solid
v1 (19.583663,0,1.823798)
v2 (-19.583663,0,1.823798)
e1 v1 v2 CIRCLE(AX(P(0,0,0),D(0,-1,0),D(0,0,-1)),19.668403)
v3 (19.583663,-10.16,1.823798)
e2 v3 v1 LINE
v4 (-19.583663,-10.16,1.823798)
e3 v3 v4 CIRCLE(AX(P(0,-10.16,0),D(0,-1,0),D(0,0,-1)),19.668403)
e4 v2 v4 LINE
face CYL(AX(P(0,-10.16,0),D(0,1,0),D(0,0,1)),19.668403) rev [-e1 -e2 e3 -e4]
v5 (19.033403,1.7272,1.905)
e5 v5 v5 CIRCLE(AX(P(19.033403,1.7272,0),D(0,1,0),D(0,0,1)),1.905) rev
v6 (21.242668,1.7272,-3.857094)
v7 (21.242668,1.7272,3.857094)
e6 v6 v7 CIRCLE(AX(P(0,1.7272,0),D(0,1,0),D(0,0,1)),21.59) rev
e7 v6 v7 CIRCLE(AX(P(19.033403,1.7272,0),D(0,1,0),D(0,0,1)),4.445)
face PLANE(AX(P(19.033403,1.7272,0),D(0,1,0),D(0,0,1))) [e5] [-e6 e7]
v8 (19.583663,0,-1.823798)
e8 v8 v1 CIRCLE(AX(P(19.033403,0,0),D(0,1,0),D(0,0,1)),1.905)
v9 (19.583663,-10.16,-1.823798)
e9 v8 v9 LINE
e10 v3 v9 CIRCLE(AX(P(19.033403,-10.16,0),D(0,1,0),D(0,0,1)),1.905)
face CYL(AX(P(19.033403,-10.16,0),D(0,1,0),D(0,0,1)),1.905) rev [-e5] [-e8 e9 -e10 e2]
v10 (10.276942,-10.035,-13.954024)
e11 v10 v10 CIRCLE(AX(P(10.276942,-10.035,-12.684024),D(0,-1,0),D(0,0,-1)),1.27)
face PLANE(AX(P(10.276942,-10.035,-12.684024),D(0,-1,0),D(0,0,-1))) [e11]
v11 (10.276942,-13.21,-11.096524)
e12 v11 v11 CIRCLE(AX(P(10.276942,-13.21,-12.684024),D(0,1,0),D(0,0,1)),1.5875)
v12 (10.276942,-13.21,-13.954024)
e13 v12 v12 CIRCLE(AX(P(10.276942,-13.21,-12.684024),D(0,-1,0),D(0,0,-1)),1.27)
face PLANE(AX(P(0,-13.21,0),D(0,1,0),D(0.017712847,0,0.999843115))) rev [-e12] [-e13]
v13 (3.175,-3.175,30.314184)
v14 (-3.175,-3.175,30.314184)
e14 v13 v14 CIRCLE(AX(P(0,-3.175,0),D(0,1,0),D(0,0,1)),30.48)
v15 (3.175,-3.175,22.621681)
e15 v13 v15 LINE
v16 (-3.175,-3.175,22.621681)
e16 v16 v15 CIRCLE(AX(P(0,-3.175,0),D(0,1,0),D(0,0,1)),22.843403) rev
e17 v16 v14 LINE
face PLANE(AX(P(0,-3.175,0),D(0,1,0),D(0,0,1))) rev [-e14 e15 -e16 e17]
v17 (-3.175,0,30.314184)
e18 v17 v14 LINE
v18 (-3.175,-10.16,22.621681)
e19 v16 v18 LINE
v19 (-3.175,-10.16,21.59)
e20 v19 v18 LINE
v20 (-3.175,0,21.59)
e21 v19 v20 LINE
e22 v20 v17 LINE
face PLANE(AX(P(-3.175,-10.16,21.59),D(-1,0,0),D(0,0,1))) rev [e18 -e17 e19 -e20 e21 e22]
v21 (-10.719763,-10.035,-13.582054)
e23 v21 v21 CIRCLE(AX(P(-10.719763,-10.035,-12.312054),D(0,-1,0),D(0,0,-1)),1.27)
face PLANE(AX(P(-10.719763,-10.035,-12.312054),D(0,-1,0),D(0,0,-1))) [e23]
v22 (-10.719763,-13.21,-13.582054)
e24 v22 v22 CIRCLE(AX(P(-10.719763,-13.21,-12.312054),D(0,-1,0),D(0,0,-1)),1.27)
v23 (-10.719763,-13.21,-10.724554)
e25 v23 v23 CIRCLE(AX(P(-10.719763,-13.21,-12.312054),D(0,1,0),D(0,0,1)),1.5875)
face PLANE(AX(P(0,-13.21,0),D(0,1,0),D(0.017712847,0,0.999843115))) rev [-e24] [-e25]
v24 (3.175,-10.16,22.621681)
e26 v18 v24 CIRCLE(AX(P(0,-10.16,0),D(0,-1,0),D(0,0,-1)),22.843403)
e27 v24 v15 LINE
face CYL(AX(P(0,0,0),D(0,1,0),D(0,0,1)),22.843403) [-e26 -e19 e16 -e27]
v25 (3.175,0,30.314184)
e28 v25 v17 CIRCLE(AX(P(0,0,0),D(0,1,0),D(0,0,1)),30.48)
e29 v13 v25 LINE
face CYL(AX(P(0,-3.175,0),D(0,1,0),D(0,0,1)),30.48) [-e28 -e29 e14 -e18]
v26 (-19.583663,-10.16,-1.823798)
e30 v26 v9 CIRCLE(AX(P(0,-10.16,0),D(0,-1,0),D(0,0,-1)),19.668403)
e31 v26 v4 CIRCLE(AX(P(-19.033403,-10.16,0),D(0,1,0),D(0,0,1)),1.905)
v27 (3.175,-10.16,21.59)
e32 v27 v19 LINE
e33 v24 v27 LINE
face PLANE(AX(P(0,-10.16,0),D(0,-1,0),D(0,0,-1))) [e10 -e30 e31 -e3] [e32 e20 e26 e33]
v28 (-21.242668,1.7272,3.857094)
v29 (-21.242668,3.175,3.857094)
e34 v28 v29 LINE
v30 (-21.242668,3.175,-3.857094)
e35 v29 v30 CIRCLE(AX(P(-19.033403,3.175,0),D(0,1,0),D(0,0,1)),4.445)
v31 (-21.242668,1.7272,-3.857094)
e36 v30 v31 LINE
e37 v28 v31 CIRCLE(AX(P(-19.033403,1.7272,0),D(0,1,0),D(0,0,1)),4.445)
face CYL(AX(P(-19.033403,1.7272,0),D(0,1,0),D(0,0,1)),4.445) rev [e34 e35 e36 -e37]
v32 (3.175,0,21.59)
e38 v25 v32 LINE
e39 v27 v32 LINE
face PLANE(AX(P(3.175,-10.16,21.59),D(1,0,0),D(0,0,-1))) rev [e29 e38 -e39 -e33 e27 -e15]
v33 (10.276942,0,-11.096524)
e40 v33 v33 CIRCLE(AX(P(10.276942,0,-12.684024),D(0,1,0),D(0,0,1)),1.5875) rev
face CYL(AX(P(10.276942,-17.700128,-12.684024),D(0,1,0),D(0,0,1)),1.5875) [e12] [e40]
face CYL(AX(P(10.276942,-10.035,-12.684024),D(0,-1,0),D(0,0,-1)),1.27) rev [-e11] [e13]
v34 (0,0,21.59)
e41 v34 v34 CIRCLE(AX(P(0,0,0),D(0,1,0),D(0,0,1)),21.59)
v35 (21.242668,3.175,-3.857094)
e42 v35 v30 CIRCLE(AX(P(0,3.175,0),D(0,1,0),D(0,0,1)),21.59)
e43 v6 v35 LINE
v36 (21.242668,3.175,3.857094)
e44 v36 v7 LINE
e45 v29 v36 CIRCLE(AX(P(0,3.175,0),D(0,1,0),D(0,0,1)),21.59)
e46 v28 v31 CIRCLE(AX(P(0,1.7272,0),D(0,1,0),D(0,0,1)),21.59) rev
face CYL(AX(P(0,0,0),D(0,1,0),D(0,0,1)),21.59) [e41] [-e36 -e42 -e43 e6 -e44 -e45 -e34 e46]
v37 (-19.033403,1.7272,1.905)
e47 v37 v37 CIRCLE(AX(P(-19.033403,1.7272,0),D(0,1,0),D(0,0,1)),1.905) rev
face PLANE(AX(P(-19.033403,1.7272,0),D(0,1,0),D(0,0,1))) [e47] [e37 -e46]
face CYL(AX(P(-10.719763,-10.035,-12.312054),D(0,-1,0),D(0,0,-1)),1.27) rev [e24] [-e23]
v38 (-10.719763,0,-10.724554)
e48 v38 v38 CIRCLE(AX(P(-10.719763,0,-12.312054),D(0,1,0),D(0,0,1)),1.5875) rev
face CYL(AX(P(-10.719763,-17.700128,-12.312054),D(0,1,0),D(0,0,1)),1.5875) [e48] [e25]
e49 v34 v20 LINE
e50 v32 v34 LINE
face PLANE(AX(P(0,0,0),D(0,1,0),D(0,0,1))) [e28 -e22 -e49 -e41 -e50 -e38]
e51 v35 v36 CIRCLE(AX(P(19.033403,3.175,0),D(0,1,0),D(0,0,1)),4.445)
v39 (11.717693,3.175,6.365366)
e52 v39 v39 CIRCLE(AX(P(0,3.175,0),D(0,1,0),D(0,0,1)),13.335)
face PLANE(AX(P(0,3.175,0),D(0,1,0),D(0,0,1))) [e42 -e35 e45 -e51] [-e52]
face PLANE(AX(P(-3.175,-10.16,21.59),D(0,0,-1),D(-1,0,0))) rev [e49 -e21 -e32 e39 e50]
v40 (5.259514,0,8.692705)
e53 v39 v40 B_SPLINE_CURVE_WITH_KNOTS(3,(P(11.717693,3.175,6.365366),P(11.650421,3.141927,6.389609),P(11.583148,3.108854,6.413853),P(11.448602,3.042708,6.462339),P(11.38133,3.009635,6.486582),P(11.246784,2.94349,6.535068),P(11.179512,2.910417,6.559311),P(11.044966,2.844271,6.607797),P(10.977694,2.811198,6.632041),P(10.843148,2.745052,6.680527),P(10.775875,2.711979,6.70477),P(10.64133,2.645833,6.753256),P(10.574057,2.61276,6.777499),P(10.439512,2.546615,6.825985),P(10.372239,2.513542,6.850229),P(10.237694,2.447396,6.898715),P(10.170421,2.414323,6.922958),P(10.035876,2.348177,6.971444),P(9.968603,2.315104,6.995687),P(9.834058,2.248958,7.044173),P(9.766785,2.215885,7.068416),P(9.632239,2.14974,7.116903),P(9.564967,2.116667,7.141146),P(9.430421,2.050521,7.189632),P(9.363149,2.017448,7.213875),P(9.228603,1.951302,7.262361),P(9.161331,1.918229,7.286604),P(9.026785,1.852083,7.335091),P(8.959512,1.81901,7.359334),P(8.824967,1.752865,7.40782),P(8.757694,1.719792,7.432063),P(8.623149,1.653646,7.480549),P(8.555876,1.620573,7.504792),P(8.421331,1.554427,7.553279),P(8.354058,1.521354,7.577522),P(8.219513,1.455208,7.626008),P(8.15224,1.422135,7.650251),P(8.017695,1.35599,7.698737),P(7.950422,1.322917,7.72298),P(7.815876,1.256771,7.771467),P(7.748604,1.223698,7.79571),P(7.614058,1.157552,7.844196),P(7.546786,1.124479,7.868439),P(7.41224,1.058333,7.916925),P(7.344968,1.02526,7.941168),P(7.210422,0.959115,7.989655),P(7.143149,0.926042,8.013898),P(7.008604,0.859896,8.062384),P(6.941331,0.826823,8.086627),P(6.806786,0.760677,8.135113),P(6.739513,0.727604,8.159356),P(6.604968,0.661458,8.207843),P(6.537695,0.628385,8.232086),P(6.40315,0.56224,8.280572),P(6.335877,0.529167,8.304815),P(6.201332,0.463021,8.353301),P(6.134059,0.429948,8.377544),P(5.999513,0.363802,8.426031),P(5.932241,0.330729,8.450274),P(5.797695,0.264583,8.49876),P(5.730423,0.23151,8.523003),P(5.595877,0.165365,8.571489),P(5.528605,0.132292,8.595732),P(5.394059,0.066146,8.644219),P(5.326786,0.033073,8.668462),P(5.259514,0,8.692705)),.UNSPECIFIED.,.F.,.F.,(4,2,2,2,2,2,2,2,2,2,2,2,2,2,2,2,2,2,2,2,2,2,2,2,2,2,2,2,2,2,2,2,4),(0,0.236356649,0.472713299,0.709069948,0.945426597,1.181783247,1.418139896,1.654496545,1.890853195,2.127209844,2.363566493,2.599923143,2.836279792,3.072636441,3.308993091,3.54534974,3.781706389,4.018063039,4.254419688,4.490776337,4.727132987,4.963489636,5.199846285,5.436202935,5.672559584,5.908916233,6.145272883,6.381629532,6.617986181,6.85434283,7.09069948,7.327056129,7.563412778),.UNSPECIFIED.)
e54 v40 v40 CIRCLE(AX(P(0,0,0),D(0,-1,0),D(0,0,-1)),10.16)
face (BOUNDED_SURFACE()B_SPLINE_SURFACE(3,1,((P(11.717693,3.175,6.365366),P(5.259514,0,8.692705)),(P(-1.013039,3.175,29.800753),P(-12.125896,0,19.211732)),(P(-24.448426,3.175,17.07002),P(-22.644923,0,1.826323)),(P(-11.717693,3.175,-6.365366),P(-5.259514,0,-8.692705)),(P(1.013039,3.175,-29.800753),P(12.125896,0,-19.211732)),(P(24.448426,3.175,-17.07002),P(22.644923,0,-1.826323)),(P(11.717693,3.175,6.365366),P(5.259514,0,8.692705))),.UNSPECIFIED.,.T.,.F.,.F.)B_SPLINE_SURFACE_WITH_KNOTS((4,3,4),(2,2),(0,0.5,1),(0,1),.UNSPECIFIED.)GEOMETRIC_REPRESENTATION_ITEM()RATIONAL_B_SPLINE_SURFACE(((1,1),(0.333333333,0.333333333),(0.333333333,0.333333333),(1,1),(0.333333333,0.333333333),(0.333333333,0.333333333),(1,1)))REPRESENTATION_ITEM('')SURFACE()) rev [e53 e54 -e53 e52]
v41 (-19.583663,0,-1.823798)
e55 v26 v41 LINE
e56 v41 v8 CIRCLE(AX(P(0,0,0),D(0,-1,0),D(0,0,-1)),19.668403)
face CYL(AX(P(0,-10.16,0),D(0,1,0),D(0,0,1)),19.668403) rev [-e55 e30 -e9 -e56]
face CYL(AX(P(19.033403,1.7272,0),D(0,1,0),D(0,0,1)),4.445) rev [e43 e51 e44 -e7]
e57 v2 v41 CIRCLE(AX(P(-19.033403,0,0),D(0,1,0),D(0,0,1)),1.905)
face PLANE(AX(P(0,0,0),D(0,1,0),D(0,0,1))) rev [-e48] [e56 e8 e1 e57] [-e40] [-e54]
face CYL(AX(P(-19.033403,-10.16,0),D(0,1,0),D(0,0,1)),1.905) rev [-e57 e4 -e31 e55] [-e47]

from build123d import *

# Parameters (mm, degrees)
SKETCH5_R               = 22.843403387
SKETCH5_R_2             = 13.335
BOSS_EXTRUDE2_DEPTH     = 3.175
SKETCH8_R               = 22.843403387
SKETCH8_R_2             = 19.668403387
BOSS_EXTRUDE3_DEPTH     = 10.16
CUT_EXTRUDE2_DEPTH      = 35.949454799
CUT_EXTRUDE2_DEPTH_BACK = 35.949454799
SKETCH9_R               = 1.905
SKETCH11_R              = 22.843403387
SKETCH11_R_2            = 21.59
CUT_EXTRUDE3_DEPTH      = 3.175
SKETCH12_R              = 30.48
SKETCH12_R_2            = 21.59
BOSS_EXTRUDE4_DEPTH     = 3.175
CUT_EXTRUDE4_DEPTH      = 45.286413266
CUT_EXTRUDE4_DEPTH_BACK = 45.286413266
SKETCH13_W              = 6.35
SKETCH13_H              = 8.89
SKETCH14_R              = 4.445
CUT_EXTRUDE5_DEPTH      = 1.4478
SKETCH15_R              = 1.5875
BOSS_EXTRUDE5_DEPTH     = 13.21
SKETCH16_R              = 1.27
CUT_EXTRUDE6_DEPTH      = 3.175


with BuildPart() as part:
    # Loft1: read off the stored shape, not the designer's step
    # Loft1: loft between two sections, ruled curve by curve
    loft1_from = [
        Edge.make_bspline([(10.081206282, 0, 5.386481216), (20.854168715, 0, -14.775931349), (0.69175615, 0, -25.548893781), (-10.081206282, 0, -5.386481216), (-20.854168715, 0, 14.775931349), (-0.69175615, 0, 25.548893781), (10.081206282, 0, 5.386481216)], [0, 0, 0, 0, 0.5, 0.5, 0.5, 1, 1, 1, 1], 3, [1, 0.333333333, 0.333333333, 1, 0.333333333, 0.333333333, 1]),
    ]
    loft1_to = [
        Edge.make_bspline([(16.298540151, 3.175, 2.633949306), (21.566438762, 3.175, -29.963130997), (-11.03064154, 3.175, -35.231029608), (-16.298540151, 3.175, -2.633949306), (-21.566438762, 3.175, 29.963130997), (11.03064154, 3.175, 35.231029608), (16.298540151, 3.175, 2.633949306)], [0, 0, 0, 0, 0.5, 0.5, 0.5, 1, 1, 1, 1], 3, [1, 0.333333333, 0.333333333, 1, 0.333333333, 0.333333333, 1]),
    ]
    loft1 = Solid(Shell([*[Face.make_surface_from_curves(loft1_from[k], loft1_to[k]) for k in range(1)], Face(Wire(loft1_from)), Face(Wire(loft1_to))]))
    add(loft1)

    # Cut-Loft1: read off the stored shape, not the designer's step
    # Cut-Loft1: loft between two sections, ruled curve by curve
    cut_loft1_from = [
        Edge.make_bspline([(11.717693295, 3.175, 6.365366356), (-1.013039416, 3.175, 29.800752946), (-24.448426006, 3.175, 17.070020235), (-11.717693295, 3.175, -6.365366356), (1.013039416, 3.175, -29.800752946), (24.448426006, 3.175, -17.070020235), (11.717693295, 3.175, 6.365366356)], [0, 0, 0, 0, 0.5, 0.5, 0.5, 1, 1, 1, 1], 3, [1, 0.333333333, 0.333333333, 1, 0.333333333, 0.333333333, 1]),
    ]
    cut_loft1_to = [
        Edge.make_bspline([(5.259513685, 0, 8.692704746), (-12.125895806, 0, 19.211732116), (-22.644923177, 0, 1.826322624), (-5.259513685, 0, -8.692704746), (12.125895806, 0, -19.211732116), (22.644923177, 0, -1.826322624), (5.259513685, 0, 8.692704746)], [0, 0, 0, 0, 0.5, 0.5, 0.5, 1, 1, 1, 1], 3, [1, 0.333333333, 0.333333333, 1, 0.333333333, 0.333333333, 1]),
    ]
    cut_loft1 = Solid(Shell([*[Face.make_surface_from_curves(cut_loft1_from[k], cut_loft1_to[k]) for k in range(1)], Face(Wire(cut_loft1_from)), Face(Wire(cut_loft1_to))]))
    add(cut_loft1, mode=Mode.SUBTRACT)

    # Sketch5 → Boss-Extrude2 (add)
    with BuildSketch(Plane(origin=(0, 3.175, 0), x_dir=(1, 0, 0), z_dir=(0, 1, 0))):
        with Locations(Location((0, 0, 0), (0, 0, 270))):
            Circle(SKETCH5_R)
        with Locations(Location((0, 0, 0), (0, 0, 270))):
            Circle(SKETCH5_R_2, mode=Mode.SUBTRACT)
    extrude(amount=-BOSS_EXTRUDE2_DEPTH)

    # Sketch10 → Revolve4 (revolve)
    with BuildSketch(Plane.XY):
        Polygon((-13.335, 1.305724577), (-10.16, 0), (-13.335, 0), align=None)
    revolve(axis=Axis((0, -10.16, 0), (0, 1, 0)))

    # Sketch8 → Boss-Extrude3 (add)
    with BuildSketch(Plane(origin=(0, 0, 0), x_dir=(-1, 0, 0), z_dir=(0, -1, 0))):
        with Locations(Location((0, 0, 0), (0, 0, 270))):
            Circle(SKETCH8_R)
        with Locations(Location((0, 0, 0), (0, 0, 90))):
            Circle(SKETCH8_R_2, mode=Mode.SUBTRACT)
    extrude(amount=BOSS_EXTRUDE3_DEPTH)

    # Sketch9 → Cut-Extrude2 (cut, two sides: drawn at the far end of the back side and taken through both)
    with BuildSketch(Plane(origin=(0, 3.175, 0), x_dir=(1, 0, 0), z_dir=(0, 1, 0)).offset(-CUT_EXTRUDE2_DEPTH_BACK)):
        with Locations(Location((19.033403387, 0, 0), (0, 0, 270))):
            Circle(SKETCH9_R)
        with Locations(Location((-19.033403387, 0, 0), (0, 0, 270))):
            Circle(SKETCH9_R)
    extrude(amount=CUT_EXTRUDE2_DEPTH + CUT_EXTRUDE2_DEPTH_BACK, mode=Mode.SUBTRACT)

    # Sketch11 → Cut-Extrude3 (cut)
    with BuildSketch(Plane(origin=(0, 3.175, 0), x_dir=(1, 0, 0), z_dir=(0, 1, 0))):
        with Locations(Location((0, 0, 0), (0, 0, 270))):
            Circle(SKETCH11_R)
        with Locations(Location((0, 0, 0), (0, 0, 270))):
            Circle(SKETCH11_R_2, mode=Mode.SUBTRACT)
    extrude(amount=-CUT_EXTRUDE3_DEPTH, mode=Mode.SUBTRACT)

    # Sketch12 → Boss-Extrude4 (add)
    with BuildSketch(Plane(origin=(0, 0, 0), x_dir=(1, 0, 0), z_dir=(0, 1, 0))):
        with Locations(Location((0, 0, 0), (0, 0, 270))):
            Circle(SKETCH12_R)
        with Locations(Location((0, 0, 0), (0, 0, 270))):
            Circle(SKETCH12_R_2, mode=Mode.SUBTRACT)
    extrude(amount=-BOSS_EXTRUDE4_DEPTH)

    # Sketch13 → Cut-Extrude4 (cut, two sides: drawn at the far end of the back side and taken through both)
    with BuildSketch(Plane(origin=(0, 0, 0), x_dir=(1, 0, 0), z_dir=(0, 1, 0)).offset(-CUT_EXTRUDE4_DEPTH_BACK)):
        with Locations((0, -26.035)):
            Rectangle(SKETCH13_W, SKETCH13_H)
    extrude(amount=CUT_EXTRUDE4_DEPTH + CUT_EXTRUDE4_DEPTH_BACK, mode=Mode.SUBTRACT)

    # Sketch14 → Cut-Extrude5 (cut)
    with BuildSketch(Plane(origin=(0, 3.175, 0), x_dir=(1, 0, 0), z_dir=(0, 1, 0))):
        with Locations((-19.033403387, 0)):
            Circle(SKETCH14_R)
        with Locations((19.033403387, 0)):
            Circle(SKETCH14_R)
    extrude(amount=-CUT_EXTRUDE5_DEPTH, mode=Mode.SUBTRACT)

    # Sketch15 → Boss-Extrude5 (add)
    with BuildSketch(Plane.XZ):
        with Locations(Location((10.276942125, -12.684023832, 0), (0, 0, 90))):
            Circle(SKETCH15_R)
        with Locations(Location((-10.719763295, -12.312054049, 0), (0, 0, 90))):
            Circle(SKETCH15_R)
    extrude(amount=BOSS_EXTRUDE5_DEPTH)

    # Sketch16 → Cut-Extrude6 (cut)
    with BuildSketch(Plane(origin=(0, -13.21, 0), x_dir=(-1, 0, 0), z_dir=(0, -1, 0))):
        with Locations(Location((10.719763295, 12.312054049, 0), (0, 0, 90))):
            Circle(SKETCH16_R)
        with Locations(Location((-10.276942125, 12.684023832, 0), (0, 0, 90))):
            Circle(SKETCH16_R)
    extrude(amount=-CUT_EXTRUDE6_DEPTH, mode=Mode.SUBTRACT)


solid = part.part
